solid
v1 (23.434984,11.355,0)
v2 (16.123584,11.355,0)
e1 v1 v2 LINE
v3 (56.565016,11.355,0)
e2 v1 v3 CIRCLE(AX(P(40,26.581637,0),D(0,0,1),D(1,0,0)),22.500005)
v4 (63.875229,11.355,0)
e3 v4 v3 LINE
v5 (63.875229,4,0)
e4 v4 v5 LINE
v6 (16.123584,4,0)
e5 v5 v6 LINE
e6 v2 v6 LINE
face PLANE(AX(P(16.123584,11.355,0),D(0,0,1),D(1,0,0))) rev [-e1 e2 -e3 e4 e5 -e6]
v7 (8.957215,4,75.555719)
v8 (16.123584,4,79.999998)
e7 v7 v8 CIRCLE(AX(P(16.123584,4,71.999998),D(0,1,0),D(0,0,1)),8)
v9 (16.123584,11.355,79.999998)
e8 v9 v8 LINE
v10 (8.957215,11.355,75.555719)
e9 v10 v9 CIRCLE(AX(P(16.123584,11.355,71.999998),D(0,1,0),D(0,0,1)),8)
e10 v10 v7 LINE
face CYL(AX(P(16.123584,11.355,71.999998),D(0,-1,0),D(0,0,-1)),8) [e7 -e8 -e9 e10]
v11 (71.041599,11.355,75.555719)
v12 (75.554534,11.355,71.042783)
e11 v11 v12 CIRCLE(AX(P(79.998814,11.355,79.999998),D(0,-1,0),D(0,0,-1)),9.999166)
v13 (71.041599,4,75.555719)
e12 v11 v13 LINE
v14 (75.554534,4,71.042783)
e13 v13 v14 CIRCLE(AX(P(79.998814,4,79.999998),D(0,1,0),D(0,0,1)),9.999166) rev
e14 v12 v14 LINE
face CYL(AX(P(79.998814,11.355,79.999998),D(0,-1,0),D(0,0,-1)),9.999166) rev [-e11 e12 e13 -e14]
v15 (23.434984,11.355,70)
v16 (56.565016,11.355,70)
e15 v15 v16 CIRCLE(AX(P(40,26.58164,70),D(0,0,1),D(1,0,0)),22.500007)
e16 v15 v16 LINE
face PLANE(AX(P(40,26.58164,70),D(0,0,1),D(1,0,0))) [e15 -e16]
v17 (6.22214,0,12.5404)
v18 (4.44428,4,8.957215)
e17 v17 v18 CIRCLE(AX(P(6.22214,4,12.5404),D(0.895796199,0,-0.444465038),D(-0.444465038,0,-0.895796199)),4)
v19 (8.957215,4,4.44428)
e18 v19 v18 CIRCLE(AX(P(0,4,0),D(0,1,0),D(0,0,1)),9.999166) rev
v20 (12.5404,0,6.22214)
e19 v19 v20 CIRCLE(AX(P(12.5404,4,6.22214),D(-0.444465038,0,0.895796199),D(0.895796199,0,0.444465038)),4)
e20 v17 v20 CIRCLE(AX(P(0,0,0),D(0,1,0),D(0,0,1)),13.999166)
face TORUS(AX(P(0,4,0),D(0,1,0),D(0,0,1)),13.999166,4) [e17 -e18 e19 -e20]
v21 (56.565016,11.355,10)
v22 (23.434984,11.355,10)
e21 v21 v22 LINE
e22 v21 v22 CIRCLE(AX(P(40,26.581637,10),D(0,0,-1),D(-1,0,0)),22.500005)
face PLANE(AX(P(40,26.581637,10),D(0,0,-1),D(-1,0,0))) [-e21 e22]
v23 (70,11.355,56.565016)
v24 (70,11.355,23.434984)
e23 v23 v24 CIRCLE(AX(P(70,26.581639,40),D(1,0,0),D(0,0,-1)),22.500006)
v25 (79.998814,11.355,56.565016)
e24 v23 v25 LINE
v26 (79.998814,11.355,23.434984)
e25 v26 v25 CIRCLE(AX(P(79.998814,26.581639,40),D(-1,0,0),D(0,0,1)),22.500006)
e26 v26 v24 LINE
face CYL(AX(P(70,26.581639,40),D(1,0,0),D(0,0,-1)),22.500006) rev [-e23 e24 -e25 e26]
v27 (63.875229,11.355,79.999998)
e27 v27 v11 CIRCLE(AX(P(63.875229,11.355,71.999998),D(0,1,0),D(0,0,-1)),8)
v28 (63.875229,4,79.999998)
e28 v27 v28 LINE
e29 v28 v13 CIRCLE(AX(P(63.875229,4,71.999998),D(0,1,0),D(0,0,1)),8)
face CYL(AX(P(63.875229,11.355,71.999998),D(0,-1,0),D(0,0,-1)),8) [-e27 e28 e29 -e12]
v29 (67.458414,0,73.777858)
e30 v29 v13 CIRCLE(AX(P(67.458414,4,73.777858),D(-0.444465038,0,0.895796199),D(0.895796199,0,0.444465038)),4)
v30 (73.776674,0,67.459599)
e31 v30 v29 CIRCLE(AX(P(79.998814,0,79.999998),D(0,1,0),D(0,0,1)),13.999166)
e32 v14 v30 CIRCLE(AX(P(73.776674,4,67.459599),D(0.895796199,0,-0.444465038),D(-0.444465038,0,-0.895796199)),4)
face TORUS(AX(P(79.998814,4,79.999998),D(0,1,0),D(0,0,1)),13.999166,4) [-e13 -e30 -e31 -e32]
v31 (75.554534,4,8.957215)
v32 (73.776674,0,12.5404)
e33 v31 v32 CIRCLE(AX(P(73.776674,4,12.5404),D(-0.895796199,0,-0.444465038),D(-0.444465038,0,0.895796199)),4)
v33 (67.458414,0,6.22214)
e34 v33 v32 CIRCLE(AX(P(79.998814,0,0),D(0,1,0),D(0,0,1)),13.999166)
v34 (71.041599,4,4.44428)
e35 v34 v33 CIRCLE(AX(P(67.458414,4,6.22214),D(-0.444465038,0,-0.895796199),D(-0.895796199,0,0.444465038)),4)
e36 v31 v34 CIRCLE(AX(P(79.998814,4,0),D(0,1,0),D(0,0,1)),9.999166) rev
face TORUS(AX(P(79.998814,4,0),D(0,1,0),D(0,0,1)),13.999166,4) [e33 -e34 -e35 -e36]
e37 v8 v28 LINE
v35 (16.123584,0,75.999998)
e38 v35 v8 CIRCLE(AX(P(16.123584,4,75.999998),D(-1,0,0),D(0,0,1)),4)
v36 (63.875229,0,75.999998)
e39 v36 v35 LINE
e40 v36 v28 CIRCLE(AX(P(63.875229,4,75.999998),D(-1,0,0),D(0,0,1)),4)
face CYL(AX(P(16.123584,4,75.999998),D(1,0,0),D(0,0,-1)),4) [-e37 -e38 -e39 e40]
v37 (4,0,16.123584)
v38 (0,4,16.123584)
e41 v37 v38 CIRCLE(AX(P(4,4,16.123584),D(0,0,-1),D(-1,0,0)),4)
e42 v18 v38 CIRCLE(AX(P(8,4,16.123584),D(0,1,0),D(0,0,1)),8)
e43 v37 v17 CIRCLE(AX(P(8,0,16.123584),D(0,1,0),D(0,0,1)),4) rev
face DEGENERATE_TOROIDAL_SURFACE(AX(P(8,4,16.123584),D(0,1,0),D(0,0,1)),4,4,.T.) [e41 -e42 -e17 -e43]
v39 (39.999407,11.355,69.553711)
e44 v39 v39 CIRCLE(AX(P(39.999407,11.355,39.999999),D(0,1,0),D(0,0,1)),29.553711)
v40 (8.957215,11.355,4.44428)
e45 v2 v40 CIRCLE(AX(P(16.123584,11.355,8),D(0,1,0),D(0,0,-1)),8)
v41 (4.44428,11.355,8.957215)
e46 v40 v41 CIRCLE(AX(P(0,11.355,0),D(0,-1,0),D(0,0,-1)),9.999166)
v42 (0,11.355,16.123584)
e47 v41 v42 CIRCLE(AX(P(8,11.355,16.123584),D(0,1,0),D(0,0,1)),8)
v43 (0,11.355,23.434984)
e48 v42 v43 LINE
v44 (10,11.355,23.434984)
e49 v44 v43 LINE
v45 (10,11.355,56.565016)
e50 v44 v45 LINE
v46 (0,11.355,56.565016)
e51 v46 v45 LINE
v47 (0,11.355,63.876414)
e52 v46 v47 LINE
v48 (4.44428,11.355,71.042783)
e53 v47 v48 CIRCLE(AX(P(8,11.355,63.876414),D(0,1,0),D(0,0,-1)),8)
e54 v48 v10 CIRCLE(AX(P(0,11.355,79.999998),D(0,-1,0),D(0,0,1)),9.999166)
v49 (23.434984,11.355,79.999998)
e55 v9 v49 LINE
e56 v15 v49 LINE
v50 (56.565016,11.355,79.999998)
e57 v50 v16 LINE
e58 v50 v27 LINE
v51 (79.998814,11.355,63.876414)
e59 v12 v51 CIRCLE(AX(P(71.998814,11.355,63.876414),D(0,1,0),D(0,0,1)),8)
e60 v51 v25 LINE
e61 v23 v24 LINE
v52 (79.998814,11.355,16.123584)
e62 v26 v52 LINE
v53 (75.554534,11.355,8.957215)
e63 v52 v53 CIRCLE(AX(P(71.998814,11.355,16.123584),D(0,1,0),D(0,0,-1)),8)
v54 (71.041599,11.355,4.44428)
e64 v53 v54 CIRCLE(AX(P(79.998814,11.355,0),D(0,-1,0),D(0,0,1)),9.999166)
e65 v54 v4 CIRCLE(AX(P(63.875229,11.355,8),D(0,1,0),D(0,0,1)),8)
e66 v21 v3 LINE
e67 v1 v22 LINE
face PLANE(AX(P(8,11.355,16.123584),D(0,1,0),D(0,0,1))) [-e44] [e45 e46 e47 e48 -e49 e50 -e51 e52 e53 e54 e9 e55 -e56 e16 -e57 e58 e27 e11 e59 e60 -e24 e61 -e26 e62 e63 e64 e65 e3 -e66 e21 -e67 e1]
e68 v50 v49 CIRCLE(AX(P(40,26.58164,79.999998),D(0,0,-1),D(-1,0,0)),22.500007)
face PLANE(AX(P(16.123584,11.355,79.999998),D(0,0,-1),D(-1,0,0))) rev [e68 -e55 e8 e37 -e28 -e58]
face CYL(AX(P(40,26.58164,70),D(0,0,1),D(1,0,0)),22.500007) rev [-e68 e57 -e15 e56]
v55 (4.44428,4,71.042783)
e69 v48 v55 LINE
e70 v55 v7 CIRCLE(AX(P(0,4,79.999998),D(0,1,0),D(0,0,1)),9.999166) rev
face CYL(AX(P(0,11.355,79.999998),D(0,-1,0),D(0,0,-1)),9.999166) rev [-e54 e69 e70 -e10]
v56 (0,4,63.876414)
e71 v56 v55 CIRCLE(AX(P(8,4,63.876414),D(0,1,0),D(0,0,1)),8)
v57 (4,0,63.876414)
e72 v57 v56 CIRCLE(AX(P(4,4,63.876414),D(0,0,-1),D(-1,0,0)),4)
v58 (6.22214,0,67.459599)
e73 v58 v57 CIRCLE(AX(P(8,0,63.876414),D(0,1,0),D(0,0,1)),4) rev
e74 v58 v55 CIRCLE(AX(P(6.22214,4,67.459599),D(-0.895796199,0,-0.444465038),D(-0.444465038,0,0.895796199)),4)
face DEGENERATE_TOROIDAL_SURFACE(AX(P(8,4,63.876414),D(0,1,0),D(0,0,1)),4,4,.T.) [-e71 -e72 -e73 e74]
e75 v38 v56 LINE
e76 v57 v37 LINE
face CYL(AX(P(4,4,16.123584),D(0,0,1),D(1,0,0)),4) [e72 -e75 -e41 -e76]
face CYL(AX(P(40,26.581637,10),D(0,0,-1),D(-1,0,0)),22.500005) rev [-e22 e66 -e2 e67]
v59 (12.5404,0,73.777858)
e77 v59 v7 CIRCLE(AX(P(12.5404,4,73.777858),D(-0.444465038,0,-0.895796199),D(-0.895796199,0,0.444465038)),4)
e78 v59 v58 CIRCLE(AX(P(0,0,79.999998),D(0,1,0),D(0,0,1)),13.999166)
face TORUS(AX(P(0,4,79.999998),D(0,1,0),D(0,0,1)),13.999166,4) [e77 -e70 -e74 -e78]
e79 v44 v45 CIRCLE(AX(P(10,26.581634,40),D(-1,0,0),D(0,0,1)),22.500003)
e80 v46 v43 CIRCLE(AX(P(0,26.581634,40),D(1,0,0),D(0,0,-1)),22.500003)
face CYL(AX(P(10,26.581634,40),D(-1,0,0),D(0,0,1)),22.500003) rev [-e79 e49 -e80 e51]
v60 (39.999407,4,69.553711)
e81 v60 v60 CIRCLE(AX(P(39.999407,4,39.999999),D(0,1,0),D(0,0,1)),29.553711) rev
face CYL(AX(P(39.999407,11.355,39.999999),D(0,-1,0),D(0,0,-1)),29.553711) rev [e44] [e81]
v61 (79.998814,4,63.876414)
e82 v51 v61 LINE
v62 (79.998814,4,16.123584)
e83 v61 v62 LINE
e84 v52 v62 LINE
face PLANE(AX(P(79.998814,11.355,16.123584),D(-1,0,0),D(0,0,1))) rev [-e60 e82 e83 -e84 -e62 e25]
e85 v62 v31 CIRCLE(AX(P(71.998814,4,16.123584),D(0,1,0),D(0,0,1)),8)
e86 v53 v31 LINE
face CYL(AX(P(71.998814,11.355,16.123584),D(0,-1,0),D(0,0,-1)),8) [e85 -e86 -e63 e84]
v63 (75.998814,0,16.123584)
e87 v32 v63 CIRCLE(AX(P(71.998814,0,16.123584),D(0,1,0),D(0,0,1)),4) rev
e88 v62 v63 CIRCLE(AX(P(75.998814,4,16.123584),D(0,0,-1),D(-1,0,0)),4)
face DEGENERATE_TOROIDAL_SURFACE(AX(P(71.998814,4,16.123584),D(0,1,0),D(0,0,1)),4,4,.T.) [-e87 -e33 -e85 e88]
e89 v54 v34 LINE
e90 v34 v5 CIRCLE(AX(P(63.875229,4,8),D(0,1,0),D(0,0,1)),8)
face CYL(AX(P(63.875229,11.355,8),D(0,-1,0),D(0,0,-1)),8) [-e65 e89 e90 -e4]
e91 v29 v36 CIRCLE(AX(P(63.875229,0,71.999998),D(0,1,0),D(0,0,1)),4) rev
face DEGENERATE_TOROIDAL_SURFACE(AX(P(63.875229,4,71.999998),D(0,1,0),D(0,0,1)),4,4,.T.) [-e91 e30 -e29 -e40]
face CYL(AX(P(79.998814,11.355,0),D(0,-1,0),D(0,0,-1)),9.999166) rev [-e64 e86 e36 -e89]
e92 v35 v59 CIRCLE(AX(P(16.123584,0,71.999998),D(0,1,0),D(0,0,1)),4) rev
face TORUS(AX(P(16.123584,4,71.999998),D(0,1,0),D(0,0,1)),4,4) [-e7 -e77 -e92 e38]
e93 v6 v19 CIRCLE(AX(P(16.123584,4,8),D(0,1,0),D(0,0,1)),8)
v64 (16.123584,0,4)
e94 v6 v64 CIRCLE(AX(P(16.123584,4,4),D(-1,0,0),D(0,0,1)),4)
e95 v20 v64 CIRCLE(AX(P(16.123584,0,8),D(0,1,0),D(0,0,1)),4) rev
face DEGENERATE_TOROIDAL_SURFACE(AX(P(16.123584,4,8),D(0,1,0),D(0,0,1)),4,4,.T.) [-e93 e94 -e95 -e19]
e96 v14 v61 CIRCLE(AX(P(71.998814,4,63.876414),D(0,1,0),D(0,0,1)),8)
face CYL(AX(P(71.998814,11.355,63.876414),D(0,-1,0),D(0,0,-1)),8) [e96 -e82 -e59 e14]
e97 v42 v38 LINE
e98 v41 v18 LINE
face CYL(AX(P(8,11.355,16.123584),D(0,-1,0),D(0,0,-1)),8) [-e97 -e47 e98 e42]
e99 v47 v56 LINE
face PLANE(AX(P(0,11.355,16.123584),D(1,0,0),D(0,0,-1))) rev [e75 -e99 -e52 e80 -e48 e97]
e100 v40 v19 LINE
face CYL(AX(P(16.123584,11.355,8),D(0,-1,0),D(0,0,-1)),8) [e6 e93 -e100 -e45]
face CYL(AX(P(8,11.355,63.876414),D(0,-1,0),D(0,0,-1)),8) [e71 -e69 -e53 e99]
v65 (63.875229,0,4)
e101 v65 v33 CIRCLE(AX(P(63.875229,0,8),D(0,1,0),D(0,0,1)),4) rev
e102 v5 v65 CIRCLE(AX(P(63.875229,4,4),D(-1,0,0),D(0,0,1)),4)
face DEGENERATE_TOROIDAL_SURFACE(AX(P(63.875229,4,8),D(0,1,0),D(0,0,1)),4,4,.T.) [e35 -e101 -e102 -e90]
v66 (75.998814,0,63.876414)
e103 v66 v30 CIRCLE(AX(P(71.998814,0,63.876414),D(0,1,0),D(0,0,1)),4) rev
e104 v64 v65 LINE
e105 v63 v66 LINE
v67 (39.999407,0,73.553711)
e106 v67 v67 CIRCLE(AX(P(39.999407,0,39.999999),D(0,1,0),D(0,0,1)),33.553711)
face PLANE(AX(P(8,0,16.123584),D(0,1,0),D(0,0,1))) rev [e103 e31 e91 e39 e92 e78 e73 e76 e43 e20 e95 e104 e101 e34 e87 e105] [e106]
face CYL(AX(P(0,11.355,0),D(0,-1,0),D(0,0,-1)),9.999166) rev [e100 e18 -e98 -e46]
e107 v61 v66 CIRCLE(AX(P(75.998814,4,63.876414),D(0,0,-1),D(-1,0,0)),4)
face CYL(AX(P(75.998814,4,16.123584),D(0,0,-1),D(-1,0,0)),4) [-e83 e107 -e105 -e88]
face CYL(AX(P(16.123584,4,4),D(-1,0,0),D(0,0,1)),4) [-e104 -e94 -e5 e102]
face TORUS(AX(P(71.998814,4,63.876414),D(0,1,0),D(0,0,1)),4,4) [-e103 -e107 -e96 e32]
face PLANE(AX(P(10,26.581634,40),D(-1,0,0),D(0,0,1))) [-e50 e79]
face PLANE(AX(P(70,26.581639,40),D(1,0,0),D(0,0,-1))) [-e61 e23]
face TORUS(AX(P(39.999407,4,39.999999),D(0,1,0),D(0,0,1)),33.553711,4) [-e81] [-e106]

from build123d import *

# Parameters (mm, degrees)
SKETCH1_R           = 29.55371142
BOSS_EXTRUDE1_DEPTH = 11.355
CUT_EXTRUDE1_DEPTH  = 9.998813
CUT_EXTRUDE5_DEPTH  = 10
CUT_EXTRUDE6_DEPTH  = 9.999998
CUT_EXTRUDE7_DEPTH  = 10
FILLET1_R           = 4


# Read off the part's stored shape, not the designer's step: Surface-Imported1
with BuildPart() as part:
    # Sketch1 → Boss-Extrude1 (new body)
    with BuildSketch(Plane(origin=(0, 0, 0), x_dir=(1, 0, 0), z_dir=(0, 1, 0))):
        with BuildLine():
            Line((16.123584474, 0), (63.875229096, 0))
            ThreePointArc((63.875229096, 0), (68.091521161, -1.20125885), (71.041598686, -4.444279694))
            ThreePointArc((71.041598686, -4.444279694), (72.928335493, -7.070478077), (75.554533876, -8.957214884))
            ThreePointArc((75.554533876, -8.957214884), (78.79755472, -11.907292409), (79.99881357, -16.123584474))
            Line((79.99881357, -16.123584474), (79.99881357, -63.876413738))
            ThreePointArc((79.99881357, -63.876413738), (78.79755472, -68.092705803), (75.554533876, -71.042783328))
            ThreePointArc((75.554533876, -71.042783328), (72.928335493, -72.929520135), (71.041598686, -75.555718518))
            ThreePointArc((71.041598686, -75.555718518), (68.091521161, -78.798739362), (63.875229096, -79.999998212))
            Line((63.875229096, -79.999998212), (16.123584474, -79.999998212))
            ThreePointArc((16.123584474, -79.999998212), (11.907292409, -78.798739362), (8.957214884, -75.555718518))
            ThreePointArc((8.957214884, -75.555718518), (7.070478077, -72.929520135), (4.444279694, -71.042783328))
            ThreePointArc((4.444279694, -71.042783328), (1.20125885, -68.092705803), (0, -63.876413738))
            Line((0, -63.876413738), (0, -16.123584474))
            ThreePointArc((0, -16.123584474), (1.20125885, -11.907292409), (4.444279694, -8.957214884))
            ThreePointArc((4.444279694, -8.957214884), (7.070478077, -7.070478077), (8.957214884, -4.444279694))
            ThreePointArc((8.957214884, -4.444279694), (11.907292409, -1.20125885), (16.123584474, 0))
        make_face()
        with Locations(Location((39.999406785, -39.999999106, 0), (0, 0, 270))):
            Circle(SKETCH1_R, mode=Mode.SUBTRACT)
    extrude(amount=BOSS_EXTRUDE1_DEPTH)

    # Sketch2 → Cut-Extrude1 (cut)
    with BuildSketch(Plane(origin=(79.99881357, 0, 0), x_dir=(0, 0, -1), z_dir=(1, 0, 0))):
        with BuildLine():
            Line((-56.770510972, 11.581630446), (-23.229489103, 11.581630446))
            ThreePointArc((-23.229489103, 11.581630446), (-40.000000037, 4.081632348), (-56.770510972, 11.581630446))
        make_face()
    extrude(amount=-CUT_EXTRUDE1_DEPTH, mode=Mode.SUBTRACT)

    # Sketch3 → Cut-Extrude5 (cut)
    with BuildSketch(Plane.ZY):
        with BuildLine():
            Line((23.229489103, 11.581630446), (56.770510972, 11.581630446))
            ThreePointArc((56.770510972, 11.581630446), (40.000000037, 4.081630803), (23.229489103, 11.581630446))
        make_face()
    extrude(amount=-CUT_EXTRUDE5_DEPTH, mode=Mode.SUBTRACT)

    # Sketch4 → Cut-Extrude6 (cut)
    with BuildSketch(Plane.XY.offset(79.999998212)):
        with BuildLine():
            Line((23.229489103, 11.581630446), (56.770510972, 11.581630446))
            ThreePointArc((56.770510972, 11.581630446), (40.000000037, 4.081632696), (23.229489103, 11.581630446))
        make_face()
    extrude(amount=-CUT_EXTRUDE6_DEPTH, mode=Mode.SUBTRACT)

    # Sketch5 → Cut-Extrude7 (cut)
    with BuildSketch(Plane(origin=(0, 0, 0), x_dir=(-1, 0, 0), z_dir=(0, 0, -1))):
        with BuildLine():
            Line((-56.770510972, 11.581630446), (-23.229489103, 11.581630446))
            ThreePointArc((-23.229489103, 11.581630446), (-40.000000037, 4.081631894), (-56.770510972, 11.581630446))
        make_face()
    extrude(amount=-CUT_EXTRUDE7_DEPTH, mode=Mode.SUBTRACT)

    # Fillet1
    fillet1_edges = [part.edges().sort_by_distance(p)[0] for p in [
        (7.070478077, 0, 7.070478077),
        (11.907292409, 0, 1.20125885),
        (39.999406785, 0, 0),
        (68.091521161, 0, 1.20125885),
        (72.928335493, 0, 7.070478077),
        (78.79755472, 0, 11.907292409),
        (79.99881357, 0, 39.999999106),
        (78.79755472, 0, 68.092705803),
        (72.928335493, 0, 72.929520135),
        (68.091521161, 0, 78.798739362),
        (39.999406785, 0, 79.999998212),
        (11.907292409, 0, 78.798739362),
        (7.070478077, 0, 72.929520135),
        (1.20125885, 0, 68.092705803),
        (0, 0, 39.999999106),
        (1.20125885, 0, 11.907292409),
        (39.999406785, 0, 10.446287686),
    ]]
    fillet(fillet1_edges, radius=FILLET1_R)


solid = part.part
